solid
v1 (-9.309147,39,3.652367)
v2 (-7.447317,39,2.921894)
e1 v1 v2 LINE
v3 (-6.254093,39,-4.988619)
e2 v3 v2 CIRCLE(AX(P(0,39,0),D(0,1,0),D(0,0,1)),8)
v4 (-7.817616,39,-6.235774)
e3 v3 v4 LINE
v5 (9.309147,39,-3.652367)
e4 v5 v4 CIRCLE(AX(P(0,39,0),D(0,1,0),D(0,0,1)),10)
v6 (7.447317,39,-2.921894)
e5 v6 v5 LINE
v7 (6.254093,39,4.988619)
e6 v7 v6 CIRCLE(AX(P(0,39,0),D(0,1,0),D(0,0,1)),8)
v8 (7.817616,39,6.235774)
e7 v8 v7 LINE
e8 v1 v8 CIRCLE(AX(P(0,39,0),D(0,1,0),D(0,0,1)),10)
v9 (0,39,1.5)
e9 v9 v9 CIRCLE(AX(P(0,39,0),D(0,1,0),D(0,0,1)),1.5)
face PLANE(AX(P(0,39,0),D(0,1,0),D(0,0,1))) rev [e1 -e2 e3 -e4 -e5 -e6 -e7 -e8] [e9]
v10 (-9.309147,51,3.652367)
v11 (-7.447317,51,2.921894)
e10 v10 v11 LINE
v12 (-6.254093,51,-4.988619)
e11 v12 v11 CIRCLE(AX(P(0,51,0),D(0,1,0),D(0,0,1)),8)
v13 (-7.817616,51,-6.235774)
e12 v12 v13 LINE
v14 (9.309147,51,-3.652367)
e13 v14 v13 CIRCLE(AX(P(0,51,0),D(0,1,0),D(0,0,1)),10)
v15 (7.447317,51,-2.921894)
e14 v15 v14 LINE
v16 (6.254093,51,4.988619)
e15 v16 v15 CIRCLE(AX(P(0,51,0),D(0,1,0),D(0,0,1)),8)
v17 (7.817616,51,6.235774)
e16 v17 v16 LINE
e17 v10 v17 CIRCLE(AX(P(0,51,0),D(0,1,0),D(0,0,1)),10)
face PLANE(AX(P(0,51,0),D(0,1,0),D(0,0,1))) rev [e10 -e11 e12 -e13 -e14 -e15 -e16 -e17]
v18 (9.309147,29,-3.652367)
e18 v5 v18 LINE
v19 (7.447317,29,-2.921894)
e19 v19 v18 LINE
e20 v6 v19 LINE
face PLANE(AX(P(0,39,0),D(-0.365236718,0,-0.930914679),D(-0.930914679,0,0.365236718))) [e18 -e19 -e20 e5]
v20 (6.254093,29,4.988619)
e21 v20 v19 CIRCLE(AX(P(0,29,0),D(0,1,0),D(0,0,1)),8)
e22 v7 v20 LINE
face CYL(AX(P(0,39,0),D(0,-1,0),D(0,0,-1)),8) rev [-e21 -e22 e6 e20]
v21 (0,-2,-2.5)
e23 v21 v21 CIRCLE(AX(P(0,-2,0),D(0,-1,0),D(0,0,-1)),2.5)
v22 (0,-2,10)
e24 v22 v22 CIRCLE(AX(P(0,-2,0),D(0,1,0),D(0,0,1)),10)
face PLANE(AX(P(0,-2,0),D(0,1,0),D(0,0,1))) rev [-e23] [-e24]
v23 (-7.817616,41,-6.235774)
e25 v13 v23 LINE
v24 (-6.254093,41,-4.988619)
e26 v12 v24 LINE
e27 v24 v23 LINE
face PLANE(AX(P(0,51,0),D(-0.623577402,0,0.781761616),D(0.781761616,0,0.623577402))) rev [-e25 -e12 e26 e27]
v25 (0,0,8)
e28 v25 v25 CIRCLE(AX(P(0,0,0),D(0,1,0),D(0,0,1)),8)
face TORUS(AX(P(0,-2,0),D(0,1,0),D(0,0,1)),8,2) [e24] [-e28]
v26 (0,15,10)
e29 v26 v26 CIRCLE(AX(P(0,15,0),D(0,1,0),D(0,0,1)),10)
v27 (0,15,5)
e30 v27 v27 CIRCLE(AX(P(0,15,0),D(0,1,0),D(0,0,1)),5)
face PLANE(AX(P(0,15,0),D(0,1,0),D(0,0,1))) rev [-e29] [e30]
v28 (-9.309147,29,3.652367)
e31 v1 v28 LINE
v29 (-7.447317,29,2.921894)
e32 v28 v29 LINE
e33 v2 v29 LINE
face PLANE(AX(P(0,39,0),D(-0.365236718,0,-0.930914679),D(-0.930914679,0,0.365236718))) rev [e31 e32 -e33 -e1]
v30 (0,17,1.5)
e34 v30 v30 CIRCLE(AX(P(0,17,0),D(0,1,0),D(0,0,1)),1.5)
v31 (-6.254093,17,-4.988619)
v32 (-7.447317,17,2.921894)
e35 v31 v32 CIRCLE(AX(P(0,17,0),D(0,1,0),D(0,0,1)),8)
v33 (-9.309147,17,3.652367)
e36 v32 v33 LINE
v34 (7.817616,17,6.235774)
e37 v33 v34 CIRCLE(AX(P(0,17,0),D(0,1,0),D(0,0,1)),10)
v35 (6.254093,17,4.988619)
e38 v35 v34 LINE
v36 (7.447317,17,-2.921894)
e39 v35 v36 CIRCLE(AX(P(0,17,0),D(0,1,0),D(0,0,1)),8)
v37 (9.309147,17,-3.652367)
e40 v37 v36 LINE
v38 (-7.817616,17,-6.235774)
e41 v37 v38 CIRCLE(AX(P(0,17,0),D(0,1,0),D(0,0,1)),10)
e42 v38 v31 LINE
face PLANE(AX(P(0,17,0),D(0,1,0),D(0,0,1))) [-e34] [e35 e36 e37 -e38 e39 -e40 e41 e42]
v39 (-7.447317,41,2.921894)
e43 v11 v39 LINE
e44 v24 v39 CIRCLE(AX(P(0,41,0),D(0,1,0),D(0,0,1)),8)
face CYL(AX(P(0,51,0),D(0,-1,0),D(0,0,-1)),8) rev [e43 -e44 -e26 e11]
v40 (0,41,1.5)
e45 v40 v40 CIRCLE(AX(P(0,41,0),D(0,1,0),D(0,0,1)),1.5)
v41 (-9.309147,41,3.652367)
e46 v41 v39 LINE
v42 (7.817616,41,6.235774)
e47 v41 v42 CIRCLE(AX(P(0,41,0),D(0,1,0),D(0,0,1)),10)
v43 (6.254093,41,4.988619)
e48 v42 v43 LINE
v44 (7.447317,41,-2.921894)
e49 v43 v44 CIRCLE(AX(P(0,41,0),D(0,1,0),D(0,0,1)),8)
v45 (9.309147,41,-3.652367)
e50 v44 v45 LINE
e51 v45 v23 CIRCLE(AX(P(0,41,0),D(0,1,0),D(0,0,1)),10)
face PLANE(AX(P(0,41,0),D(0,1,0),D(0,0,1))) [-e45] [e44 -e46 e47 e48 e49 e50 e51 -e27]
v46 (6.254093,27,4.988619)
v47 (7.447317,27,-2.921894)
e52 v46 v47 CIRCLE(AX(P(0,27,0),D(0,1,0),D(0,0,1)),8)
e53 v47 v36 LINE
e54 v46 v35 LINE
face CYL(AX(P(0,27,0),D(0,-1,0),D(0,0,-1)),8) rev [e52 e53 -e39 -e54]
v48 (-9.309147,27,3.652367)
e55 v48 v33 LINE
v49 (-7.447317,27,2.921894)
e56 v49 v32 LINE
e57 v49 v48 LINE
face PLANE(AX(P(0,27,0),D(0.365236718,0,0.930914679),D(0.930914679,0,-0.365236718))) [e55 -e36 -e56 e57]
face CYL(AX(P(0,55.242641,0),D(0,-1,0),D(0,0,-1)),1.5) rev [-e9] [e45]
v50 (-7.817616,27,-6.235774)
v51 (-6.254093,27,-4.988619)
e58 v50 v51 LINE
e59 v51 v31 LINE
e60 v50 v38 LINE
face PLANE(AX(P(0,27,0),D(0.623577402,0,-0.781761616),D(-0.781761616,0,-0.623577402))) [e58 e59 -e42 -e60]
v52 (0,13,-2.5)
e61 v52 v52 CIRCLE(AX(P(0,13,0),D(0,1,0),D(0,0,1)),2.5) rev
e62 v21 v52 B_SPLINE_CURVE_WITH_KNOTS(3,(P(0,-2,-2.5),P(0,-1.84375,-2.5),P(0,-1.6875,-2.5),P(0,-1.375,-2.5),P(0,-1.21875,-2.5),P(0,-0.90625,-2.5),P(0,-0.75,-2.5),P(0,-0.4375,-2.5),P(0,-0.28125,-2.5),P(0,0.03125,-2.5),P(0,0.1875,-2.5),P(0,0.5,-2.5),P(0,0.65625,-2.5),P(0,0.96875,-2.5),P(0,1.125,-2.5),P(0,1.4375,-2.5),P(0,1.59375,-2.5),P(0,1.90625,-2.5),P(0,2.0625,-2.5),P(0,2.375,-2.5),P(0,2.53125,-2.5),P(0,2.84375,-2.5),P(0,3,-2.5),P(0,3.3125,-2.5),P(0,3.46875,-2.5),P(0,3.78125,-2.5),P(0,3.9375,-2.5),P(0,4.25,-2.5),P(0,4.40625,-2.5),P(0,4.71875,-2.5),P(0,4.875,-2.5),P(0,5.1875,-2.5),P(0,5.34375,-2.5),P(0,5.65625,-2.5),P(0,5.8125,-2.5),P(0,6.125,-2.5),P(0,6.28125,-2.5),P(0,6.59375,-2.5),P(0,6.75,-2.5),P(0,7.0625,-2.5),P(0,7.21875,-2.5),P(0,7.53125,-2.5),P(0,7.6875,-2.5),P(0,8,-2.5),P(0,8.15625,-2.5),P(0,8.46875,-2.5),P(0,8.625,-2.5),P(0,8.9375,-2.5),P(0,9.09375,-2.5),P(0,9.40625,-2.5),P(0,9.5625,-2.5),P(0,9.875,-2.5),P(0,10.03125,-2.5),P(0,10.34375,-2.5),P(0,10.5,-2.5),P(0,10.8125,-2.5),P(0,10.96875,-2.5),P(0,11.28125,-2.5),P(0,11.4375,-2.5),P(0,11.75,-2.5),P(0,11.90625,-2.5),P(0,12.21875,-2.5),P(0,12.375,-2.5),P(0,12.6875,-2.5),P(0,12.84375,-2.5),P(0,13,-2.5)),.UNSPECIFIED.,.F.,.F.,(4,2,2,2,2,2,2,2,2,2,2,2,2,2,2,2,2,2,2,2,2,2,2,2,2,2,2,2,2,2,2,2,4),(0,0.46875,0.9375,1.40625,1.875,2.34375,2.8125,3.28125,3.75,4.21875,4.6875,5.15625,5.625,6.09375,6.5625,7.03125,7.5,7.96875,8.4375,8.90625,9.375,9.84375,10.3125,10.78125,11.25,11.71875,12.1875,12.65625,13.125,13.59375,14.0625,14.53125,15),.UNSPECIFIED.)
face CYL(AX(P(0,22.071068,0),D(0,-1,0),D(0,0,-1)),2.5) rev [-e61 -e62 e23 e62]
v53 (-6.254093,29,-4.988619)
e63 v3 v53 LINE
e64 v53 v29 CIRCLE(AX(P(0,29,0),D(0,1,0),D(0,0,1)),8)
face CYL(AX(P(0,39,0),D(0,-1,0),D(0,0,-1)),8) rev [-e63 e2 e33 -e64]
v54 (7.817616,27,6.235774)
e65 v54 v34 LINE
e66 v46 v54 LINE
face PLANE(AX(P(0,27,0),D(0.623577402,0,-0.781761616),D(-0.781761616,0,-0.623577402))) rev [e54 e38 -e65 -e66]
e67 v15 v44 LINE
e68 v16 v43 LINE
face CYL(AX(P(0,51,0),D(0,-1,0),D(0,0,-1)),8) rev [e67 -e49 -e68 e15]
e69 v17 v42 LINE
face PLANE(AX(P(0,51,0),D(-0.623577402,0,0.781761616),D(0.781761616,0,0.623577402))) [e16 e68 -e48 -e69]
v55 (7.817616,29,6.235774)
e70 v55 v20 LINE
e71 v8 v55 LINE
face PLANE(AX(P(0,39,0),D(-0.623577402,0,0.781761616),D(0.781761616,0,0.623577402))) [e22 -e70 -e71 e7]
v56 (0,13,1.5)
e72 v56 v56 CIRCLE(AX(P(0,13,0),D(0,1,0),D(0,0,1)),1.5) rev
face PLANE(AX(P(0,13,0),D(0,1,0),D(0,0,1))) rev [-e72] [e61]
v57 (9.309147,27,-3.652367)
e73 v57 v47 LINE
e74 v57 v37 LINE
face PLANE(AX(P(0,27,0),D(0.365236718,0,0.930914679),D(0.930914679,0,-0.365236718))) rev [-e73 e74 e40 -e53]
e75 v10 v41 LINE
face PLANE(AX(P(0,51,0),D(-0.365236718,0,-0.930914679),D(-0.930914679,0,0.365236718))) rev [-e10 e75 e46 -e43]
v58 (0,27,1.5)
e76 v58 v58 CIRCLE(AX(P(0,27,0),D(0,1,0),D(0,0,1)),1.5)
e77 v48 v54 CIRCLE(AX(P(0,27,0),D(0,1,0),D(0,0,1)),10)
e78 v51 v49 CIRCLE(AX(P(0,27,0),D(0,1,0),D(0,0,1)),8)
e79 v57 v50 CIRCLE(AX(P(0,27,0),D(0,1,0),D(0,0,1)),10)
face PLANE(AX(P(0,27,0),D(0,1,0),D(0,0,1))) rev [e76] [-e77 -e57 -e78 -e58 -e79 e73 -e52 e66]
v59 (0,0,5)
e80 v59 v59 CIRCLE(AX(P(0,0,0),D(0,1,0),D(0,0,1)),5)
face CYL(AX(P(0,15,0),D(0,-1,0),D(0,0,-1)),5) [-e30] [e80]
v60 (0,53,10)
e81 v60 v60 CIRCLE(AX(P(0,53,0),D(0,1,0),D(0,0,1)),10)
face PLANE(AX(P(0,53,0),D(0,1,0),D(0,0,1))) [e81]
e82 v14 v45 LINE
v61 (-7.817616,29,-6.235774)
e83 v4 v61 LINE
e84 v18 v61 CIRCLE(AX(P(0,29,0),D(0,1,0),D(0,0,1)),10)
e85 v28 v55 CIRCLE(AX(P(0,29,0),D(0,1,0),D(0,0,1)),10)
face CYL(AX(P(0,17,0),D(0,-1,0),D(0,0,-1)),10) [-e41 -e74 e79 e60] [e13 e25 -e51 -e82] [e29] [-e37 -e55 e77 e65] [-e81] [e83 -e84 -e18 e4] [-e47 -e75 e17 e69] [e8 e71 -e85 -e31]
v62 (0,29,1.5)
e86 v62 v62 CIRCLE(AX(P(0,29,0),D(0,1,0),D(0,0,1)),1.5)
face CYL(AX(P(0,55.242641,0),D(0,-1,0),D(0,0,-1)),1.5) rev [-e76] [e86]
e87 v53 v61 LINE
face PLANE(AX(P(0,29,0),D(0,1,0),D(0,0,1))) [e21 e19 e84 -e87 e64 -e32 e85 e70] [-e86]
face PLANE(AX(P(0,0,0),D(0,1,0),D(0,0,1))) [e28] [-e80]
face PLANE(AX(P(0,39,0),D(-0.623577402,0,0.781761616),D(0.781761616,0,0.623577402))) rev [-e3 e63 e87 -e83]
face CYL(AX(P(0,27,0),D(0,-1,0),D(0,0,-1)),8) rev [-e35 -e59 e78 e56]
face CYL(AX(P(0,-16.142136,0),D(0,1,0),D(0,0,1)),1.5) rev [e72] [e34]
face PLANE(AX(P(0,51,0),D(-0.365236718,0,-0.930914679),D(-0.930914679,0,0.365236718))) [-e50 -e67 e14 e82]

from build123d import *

# Parameters (mm, degrees)
CROQUIS1_R               = 5
SALIENTE_EXTRUIR1_DEPTH  = 15
CROQUIS1_3_R             = 10
CROQUIS1_3_R_2           = 5
SALIENTE_EXTRUIR2_DEPTH  = 2
CROQUIS2_R               = 10
SALIENTE_EXTRUIR3_DEPTH  = 2
SALIENTE_EXTRUIR4_DEPTH  = 10
CROQUIS4_R               = 10
SALIENTE_EXTRUIR5_DEPTH  = 2
SALIENTE_EXTRUIR6_START  = 12
SALIENTE_EXTRUIR6_DEPTH  = 10
CROQUIS5_R               = 10
SALIENTE_EXTRUIR7_DEPTH  = 2
SALIENTE_EXTRUIR8_START  = 24
SALIENTE_EXTRUIR8_DEPTH  = 10
CROQUIS7_R               = 10
SALIENTE_EXTRUIR9_DEPTH  = 2
CORTAR_EXTRUIR1_REACH    = 56.854
CROQUIS9_R               = 1.5
SALIENTE_EXTRUIR10_START = 2
CROQUIS10_R              = 5
CROQUIS10_R_2            = 1.5
SALIENTE_EXTRUIR10_DEPTH = 2
CROQUIS11_R              = 2.5
CORTAR_EXTRUIR2_DEPTH    = 15
REDONDEO1_R              = 2


with BuildPart() as part:
    # Croquis1 → Saliente-Extruir1 (new body)
    with BuildSketch(Plane(origin=(0, 0, 0), x_dir=(1, 0, 0), z_dir=(0, 1, 0))):
        with Locations(Location((0, 0, 0), (0, 0, 270))):
            Circle(CROQUIS1_R)
    extrude(amount=SALIENTE_EXTRUIR1_DEPTH)

    # Croquis2 → Saliente-Extruir3 (add)
    with BuildSketch(Plane(origin=(0, 15, 0), x_dir=(1, 0, 0), z_dir=(0, 1, 0))):
        with Locations(Location((0, 0, 0), (0, 0, 270))):
            Circle(CROQUIS2_R)
    extrude(amount=SALIENTE_EXTRUIR3_DEPTH)

    # Croquis3 → Saliente-Extruir4 (add)
    with BuildSketch(Plane(origin=(0, 17, 0), x_dir=(1, 0, 0), z_dir=(0, 1, 0))):
        with BuildLine():
            Line((-6.254092926, 4.988619216), (-7.817616157, 6.235774019))
            ThreePointArc((-7.817616157, 6.235774019), (-9.888141199, 1.491530635), (-9.309146792, -3.652367179))
            Line((-9.309146792, -3.652367179), (-7.447317433, -2.921893743))
            ThreePointArc((-7.447317433, -2.921893743), (-7.910512959, 1.193224508), (-6.254092926, 4.988619216))
        make_face()
        with BuildLine():
            ThreePointArc((7.817616157, -6.235774019), (9.888141199, -1.491530635), (9.309146792, 3.652367179))
            Line((9.309146792, 3.652367179), (7.447317433, 2.921893743))
            ThreePointArc((7.447317433, 2.921893743), (7.910512959, -1.193224508), (6.254092926, -4.988619216))
            Line((6.254092926, -4.988619216), (7.817616157, -6.235774019))
        make_face()
    extrude(amount=SALIENTE_EXTRUIR4_DEPTH)

    # Croquis4 → Saliente-Extruir5 (add)
    with BuildSketch(Plane(origin=(0, 27, 0), x_dir=(1, 0, 0), z_dir=(0, 1, 0))):
        with Locations(Location((0, 0, 0), (0, 0, 270))):
            Circle(CROQUIS4_R)
    extrude(amount=SALIENTE_EXTRUIR5_DEPTH)

    # Croquis3<3> → Saliente-Extruir6 (add)
    with BuildSketch(Plane(origin=(0, 17, 0), x_dir=(1, 0, 0), z_dir=(0, 1, 0)).offset(SALIENTE_EXTRUIR6_START)):
        with BuildLine():
            Line((-6.254092926, 4.988619216), (-7.817616157, 6.235774019))
            ThreePointArc((-7.817616157, 6.235774019), (-9.888141199, 1.491530635), (-9.309146792, -3.652367179))
            Line((-9.309146792, -3.652367179), (-7.447317433, -2.921893743))
            ThreePointArc((-7.447317433, -2.921893743), (-7.910512959, 1.193224508), (-6.254092926, 4.988619216))
        make_face()
        with BuildLine():
            ThreePointArc((7.817616157, -6.235774019), (9.888141199, -1.491530635), (9.309146792, 3.652367179))
            Line((9.309146792, 3.652367179), (7.447317433, 2.921893743))
            ThreePointArc((7.447317433, 2.921893743), (7.910512959, -1.193224508), (6.254092926, -4.988619216))
            Line((6.254092926, -4.988619216), (7.817616157, -6.235774019))
        make_face()
    extrude(amount=SALIENTE_EXTRUIR6_DEPTH)

    # Croquis5 → Saliente-Extruir7 (add)
    with BuildSketch(Plane(origin=(0, 39, 0), x_dir=(1, 0, 0), z_dir=(0, 1, 0))):
        with Locations(Location((0, 0, 0), (0, 0, 270))):
            Circle(CROQUIS5_R)
    extrude(amount=SALIENTE_EXTRUIR7_DEPTH)

    # Croquis3<4> → Saliente-Extruir8 (add)
    with BuildSketch(Plane(origin=(0, 17, 0), x_dir=(1, 0, 0), z_dir=(0, 1, 0)).offset(SALIENTE_EXTRUIR8_START)):
        with BuildLine():
            Line((-6.254092926, 4.988619216), (-7.817616157, 6.235774019))
            ThreePointArc((-7.817616157, 6.235774019), (-9.888141199, 1.491530635), (-9.309146792, -3.652367179))
            Line((-9.309146792, -3.652367179), (-7.447317433, -2.921893743))
            ThreePointArc((-7.447317433, -2.921893743), (-7.910512959, 1.193224508), (-6.254092926, 4.988619216))
        make_face()
        with BuildLine():
            ThreePointArc((7.817616157, -6.235774019), (9.888141199, -1.491530635), (9.309146792, 3.652367179))
            Line((9.309146792, 3.652367179), (7.447317433, 2.921893743))
            ThreePointArc((7.447317433, 2.921893743), (7.910512959, -1.193224508), (6.254092926, -4.988619216))
            Line((6.254092926, -4.988619216), (7.817616157, -6.235774019))
        make_face()
    extrude(amount=SALIENTE_EXTRUIR8_DEPTH)

    # Croquis7 → Saliente-Extruir9 (add)
    with BuildSketch(Plane(origin=(0, 51, 0), x_dir=(1, 0, 0), z_dir=(0, 1, 0))):
        with Locations(Location((0, 0, 0), (0, 0, 270))):
            Circle(CROQUIS7_R)
    extrude(amount=SALIENTE_EXTRUIR9_DEPTH)

    # Cortar-Extruir1: up to this face of the body (flat: up to its plane)
    cortar_extruir1_end = Plane(part.part.faces().sort_by_distance((0, 51, 0))[0])
    # Croquis9 → Cortar-Extruir1 (cut, up to the picked face)
    with BuildSketch(Plane.XZ, mode=Mode.PRIVATE) as cortar_extruir1_sk1:
        with Locations(Location((0, 0, 0), (0, 0, 90))):
            Circle(CROQUIS9_R)
    cortar_extruir1_tool1 = split(extrude(cortar_extruir1_sk1.sketch, amount=-CORTAR_EXTRUIR1_REACH, mode=Mode.PRIVATE), bisect_by=cortar_extruir1_end, keep=Keep.BOTH, mode=Mode.PRIVATE)
    add(cortar_extruir1_tool1.solids().sort_by(Axis((0, 0, 0), (0, 1, 0)))[0], mode=Mode.SUBTRACT)



with BuildPart() as body_2:
    # Croquis1<3> → Saliente-Extruir2 (new body)
    with BuildSketch(Plane(origin=(0, 0, 0), x_dir=(1, 0, 0), z_dir=(0, 1, 0))):
        with Locations(Location((0, 0, 0), (0, 0, 270))):
            Circle(CROQUIS1_3_R)
        with Locations(Location((0, 0, 0), (0, 0, 270))):
            Circle(CROQUIS1_3_R_2, mode=Mode.SUBTRACT)
    extrude(amount=-SALIENTE_EXTRUIR2_DEPTH)


with BuildPart() as part_1:
    add(part.part)

    add(body_2.part)  # Saliente-Extruir10 merges body 2
    # Croquis10 → Saliente-Extruir10 (add)
    with BuildSketch(Plane.XZ.offset(SALIENTE_EXTRUIR10_START)):
        with Locations(Location((0, 0, 0), (0, 0, 90))):
            Circle(CROQUIS10_R)
        with Locations(Location((0, 0, 0), (0, 0, 90))):
            Circle(CROQUIS10_R_2, mode=Mode.SUBTRACT)
    extrude(amount=-SALIENTE_EXTRUIR10_DEPTH)

    # Croquis11 → Cortar-Extruir2 (cut)
    with BuildSketch(Plane.XZ.offset(2)):
        with Locations(Location((0, 0, 0), (0, 0, 270))):
            Circle(CROQUIS11_R)
    extrude(amount=-CORTAR_EXTRUIR2_DEPTH, mode=Mode.SUBTRACT)

    # Redondeo1
    redondeo1_edges = [part_1.edges().sort_by_distance(p)[0] for p in [
        (0, 0, -10),
    ]]
    fillet(redondeo1_edges, radius=REDONDEO1_R - 0.0001)  # a hair under: the kernel refuses the full size


solid = part_1.part
